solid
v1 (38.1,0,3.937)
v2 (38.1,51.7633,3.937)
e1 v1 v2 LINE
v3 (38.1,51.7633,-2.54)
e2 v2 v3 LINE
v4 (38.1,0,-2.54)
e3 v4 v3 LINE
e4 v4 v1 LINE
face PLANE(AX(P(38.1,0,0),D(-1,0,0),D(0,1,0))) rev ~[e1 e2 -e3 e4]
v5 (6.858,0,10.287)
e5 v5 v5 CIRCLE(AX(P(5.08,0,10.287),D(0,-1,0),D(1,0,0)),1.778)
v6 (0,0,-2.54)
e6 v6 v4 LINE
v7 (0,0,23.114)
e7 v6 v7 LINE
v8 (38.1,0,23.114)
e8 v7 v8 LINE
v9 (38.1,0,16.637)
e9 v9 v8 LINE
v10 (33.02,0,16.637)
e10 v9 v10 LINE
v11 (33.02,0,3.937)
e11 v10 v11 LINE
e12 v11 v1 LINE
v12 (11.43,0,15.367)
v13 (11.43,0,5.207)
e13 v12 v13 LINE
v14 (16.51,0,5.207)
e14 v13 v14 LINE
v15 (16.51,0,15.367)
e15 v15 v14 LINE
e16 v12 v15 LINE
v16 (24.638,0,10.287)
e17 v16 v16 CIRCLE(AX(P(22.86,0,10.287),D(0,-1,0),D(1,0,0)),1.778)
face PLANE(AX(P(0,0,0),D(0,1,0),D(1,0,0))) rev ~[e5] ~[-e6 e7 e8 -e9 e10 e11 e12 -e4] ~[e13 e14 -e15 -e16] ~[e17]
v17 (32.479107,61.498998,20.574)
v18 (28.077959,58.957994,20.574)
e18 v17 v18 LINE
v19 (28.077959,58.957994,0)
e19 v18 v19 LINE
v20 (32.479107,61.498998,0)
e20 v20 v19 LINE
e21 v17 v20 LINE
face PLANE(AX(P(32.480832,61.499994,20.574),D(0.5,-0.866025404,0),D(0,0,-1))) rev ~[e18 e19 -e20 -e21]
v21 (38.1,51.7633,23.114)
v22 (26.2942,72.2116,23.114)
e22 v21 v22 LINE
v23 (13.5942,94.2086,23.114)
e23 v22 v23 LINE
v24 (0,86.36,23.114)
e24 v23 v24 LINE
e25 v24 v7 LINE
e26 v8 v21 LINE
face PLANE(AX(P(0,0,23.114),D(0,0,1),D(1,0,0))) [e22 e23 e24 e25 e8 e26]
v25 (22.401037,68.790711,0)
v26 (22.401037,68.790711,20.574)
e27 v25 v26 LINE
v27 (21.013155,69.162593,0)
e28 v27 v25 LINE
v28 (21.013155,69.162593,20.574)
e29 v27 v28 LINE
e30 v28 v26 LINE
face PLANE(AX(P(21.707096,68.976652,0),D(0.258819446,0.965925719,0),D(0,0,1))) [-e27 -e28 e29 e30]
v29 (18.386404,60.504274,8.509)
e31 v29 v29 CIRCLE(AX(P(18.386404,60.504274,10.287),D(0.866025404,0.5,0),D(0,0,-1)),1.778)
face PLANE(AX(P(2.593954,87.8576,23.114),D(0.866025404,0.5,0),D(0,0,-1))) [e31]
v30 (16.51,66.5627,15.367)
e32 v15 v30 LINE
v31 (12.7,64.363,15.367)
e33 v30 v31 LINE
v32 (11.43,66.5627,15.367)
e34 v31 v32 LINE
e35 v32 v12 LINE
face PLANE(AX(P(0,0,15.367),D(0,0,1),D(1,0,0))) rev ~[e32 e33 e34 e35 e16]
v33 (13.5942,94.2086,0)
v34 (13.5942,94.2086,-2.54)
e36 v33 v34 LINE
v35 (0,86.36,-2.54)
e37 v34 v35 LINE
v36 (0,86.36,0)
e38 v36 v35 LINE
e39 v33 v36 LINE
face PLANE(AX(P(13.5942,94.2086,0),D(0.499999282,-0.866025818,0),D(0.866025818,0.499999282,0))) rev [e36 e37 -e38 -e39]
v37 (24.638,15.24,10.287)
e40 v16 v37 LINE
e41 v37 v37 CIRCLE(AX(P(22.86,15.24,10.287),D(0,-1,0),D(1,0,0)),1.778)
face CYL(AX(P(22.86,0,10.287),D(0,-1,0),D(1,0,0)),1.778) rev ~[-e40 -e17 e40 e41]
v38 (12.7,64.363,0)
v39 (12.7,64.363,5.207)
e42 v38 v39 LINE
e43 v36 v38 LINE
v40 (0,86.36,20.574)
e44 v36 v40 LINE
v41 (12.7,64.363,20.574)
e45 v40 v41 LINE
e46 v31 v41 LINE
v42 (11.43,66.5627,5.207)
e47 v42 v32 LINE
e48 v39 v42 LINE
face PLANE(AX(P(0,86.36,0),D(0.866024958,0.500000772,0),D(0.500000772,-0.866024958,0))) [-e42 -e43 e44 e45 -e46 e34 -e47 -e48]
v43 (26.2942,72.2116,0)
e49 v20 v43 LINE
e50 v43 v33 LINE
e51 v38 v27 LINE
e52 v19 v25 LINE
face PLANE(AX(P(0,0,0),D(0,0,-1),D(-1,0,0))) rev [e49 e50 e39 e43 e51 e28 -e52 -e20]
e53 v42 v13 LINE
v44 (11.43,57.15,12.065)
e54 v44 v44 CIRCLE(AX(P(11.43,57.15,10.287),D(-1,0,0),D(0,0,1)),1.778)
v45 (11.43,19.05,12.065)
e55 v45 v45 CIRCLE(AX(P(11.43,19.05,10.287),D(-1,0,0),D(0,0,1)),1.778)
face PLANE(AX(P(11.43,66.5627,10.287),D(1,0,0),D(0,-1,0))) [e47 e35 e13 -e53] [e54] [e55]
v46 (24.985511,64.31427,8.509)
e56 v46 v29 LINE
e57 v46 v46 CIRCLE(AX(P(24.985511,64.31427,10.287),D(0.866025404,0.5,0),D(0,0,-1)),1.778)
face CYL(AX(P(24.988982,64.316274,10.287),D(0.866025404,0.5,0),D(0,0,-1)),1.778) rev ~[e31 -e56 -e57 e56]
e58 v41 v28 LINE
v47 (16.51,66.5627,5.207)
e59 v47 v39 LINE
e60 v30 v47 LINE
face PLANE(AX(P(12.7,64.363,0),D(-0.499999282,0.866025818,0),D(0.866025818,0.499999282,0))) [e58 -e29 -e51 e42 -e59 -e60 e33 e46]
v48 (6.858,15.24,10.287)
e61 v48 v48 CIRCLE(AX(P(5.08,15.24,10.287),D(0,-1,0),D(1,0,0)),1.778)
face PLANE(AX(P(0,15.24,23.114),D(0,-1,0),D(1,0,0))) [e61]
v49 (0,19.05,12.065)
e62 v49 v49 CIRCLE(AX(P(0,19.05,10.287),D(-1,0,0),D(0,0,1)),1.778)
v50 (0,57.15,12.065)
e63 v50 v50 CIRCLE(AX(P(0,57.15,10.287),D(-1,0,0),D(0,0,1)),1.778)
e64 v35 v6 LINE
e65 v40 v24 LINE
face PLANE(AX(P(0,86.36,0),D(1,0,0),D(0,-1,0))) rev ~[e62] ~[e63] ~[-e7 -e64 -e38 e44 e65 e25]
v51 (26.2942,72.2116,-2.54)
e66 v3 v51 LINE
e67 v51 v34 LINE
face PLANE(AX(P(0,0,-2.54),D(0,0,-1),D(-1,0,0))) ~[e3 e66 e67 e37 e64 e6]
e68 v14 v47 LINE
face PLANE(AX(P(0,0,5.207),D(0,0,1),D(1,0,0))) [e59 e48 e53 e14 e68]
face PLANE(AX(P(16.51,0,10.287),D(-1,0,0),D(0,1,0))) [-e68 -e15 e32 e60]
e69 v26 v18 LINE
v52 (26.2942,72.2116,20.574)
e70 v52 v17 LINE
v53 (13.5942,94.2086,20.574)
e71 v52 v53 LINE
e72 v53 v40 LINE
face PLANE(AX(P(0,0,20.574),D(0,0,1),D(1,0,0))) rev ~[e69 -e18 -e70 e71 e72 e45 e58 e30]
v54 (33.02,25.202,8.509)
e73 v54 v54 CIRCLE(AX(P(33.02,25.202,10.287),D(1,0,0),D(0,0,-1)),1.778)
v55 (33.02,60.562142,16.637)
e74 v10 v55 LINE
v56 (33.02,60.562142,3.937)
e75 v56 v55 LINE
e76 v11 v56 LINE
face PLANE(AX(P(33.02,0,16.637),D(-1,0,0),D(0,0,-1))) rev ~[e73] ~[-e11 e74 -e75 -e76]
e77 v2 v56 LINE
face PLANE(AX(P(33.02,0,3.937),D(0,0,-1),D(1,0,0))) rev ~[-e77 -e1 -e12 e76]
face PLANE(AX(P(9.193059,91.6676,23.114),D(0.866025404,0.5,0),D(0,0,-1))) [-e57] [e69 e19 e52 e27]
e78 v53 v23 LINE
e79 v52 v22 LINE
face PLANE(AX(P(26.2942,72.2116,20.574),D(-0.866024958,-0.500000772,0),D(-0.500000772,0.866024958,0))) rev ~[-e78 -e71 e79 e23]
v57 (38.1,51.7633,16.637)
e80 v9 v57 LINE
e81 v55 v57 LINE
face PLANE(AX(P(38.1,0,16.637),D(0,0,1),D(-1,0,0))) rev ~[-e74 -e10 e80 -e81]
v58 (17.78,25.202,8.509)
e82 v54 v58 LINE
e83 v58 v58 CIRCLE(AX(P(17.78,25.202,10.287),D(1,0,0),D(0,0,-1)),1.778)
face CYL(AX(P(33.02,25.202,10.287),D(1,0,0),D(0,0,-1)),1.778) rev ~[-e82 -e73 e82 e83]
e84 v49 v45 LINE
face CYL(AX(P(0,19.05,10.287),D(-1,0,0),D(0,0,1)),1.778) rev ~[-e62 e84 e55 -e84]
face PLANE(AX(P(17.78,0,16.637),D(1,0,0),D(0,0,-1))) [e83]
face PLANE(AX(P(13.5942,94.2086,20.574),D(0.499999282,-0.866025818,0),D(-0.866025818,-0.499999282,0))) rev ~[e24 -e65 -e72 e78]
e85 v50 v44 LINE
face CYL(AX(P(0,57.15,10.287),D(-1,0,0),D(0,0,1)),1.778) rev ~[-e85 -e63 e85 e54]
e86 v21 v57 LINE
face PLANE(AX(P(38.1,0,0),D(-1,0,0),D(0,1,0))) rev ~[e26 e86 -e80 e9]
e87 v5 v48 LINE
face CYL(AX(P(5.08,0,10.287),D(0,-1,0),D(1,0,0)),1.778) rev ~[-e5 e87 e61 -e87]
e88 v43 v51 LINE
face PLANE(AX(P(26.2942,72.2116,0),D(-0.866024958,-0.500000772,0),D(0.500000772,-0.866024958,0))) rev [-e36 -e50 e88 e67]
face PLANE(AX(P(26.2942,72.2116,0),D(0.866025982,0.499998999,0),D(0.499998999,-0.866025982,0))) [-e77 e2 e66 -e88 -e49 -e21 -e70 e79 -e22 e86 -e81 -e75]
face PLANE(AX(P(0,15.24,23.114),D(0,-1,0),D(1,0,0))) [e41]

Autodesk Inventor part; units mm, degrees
ref_plane "YZ Plane" through (0, 0, 0) normal (1, 0, 0) x (0, 1, 0)
ref_plane "XZ Plane" through (0, 0, 0) normal (0, 1, 0) x (-1, 0, 0)
sketch "Sketch1" plane through (0, 0, 0) normal (0, 0, 1) x (1, 0, 0)
  line L0 (0, 0) -> (38.1, 0)
  line L1 (38.1, 0) -> (38.1, 51.7633)
  line L2 (0, 86.36) -> (0, 0)
  line L3 (0, 86.36) -> (13.5942, 94.2086)
  line L4 (0, 86.36) -> (12.7, 64.363)
  line L5 (12.7, 64.363) -> (26.2942, 72.2116)
  line L6 (26.2942, 72.2116) -> (13.5942, 94.2086)
  line L7 (26.2942, 72.2116) -> (38.1, 51.7633)
  dimension "d0" = 15.6972
  dimension "d1" = 25.4
  dimension "d2" = 38.1
  dimension "d3" = 86.36
  dimension "d4" = 120
extrude "Extrusion1" add sketch "Sketch1" along normal blind 20.574 contours L2 L4 L5 L7 L1 L0
sketch "Sketch2" plane through (0, 0, 20.574) normal (0, 0, 1) x (1, 0, 0)
  line L0 (0, 86.36) -> (0, 0) projected
  line L1 (0, 0) -> (38.1, 0) projected
  line L2 (38.1, 0) -> (38.1, 51.7633) projected
  line L3 (38.1, 51.7633) -> (26.2942, 72.2116) projected
  line L4 (26.2942, 72.2116) -> (12.7, 64.363) projected
  line L5 (12.7, 64.363) -> (0, 86.36) projected
  line L6 (26.2942, 72.2116) -> (13.5942, 94.2086)
  line L7 (13.5942, 94.2086) -> (0, 86.36)
  line L8 (38.1, 51.7633) -> (26.2942, 72.2116) projected
extrude "Extrusion2" add sketch "Sketch2" along normal blind 2.54
ref_plane "Work Plane1" through (0, 0, 10.287) normal (0, 0, -1) x (-1, 0, 0)
mirror "Mirror1" about plane through (0, 0, 10.287) normal (0, 0, -1) of "Extrusion2"
sketch "Sketch3" plane through (0, 0, 23.114) normal (0, -1, 0) x (1, 0, 0)
  line L0 (38.1, -25.654) -> (38.1, 0) projected
  line L1 (38.1, -6.477) -> (33.02, -6.477)
  line L2 (33.02, -6.477) -> (33.02, -19.177)
  line L3 (33.02, -19.177) -> (38.1, -19.177)
  line L4 (38.1, -19.177) -> (38.1, -6.477)
  point P0 (0, -23.114)
  point P1 (38.1, -12.827)
  dimension "d9" = 12.7
  dimension "d10" = 6.35
  dimension "d11" = 5.08
extrude "Extrusion3" cut sketch "Sketch3" against normal blind 76.2
sketch "Sketch4" plane through (33.02, 0, 16.637) normal (1, 0, 0) x (0, 0, -1)
  circle A0 centre (6.35, 25.202) radius 1.778 projected
  point P0 (16.637, 0)
extrude "Extrusion4" cut sketch "Sketch4" against normal blind 15.24
sketch "Sketch5" plane through (13.5942, 94.2086, 23.114) normal (0.8660254, 0.5, 0) x (0, 0, -1)
  line L0 (23.114, -25.4) -> (2.54, -25.4) projected
  line L1 (23.114, -25.4) -> (2.54, -25.4)
  line L2 (2.54, -25.4) -> (2.54, -37.7698)
  line L3 (2.54, -37.7698) -> (23.114, -37.7698)
  line L4 (23.114, -37.7698) -> (23.114, -25.4)
  point P0 (23.114, -74.79)
  dimension "d16" = 12.3698
extrude "Extrusion5" cut sketch "Sketch5" against normal blind 5.08
chamfer "Chamfer1" distance 1.016 angle 45 1 edges at (21.893, 69.6706, 10.287)
sketch "Sketch6" plane through (9.1948, 91.6686, 23.114) normal (0.8660254, 0.5, 0) x (0, 0, -1)
  line L0 (22.86, -25.4) -> (2.54, -25.4) projected
  line L1 (23.114, -37.7698) -> (2.54, -37.7698) projected
  circle A0 centre (12.827, -31.5849) radius 1.778
  line L2 (2.54, -37.7698) -> (2.54, 0) projected
  line L3 (2.54, -25.4) -> (2.54, -37.7698)
  point P0 (23.114, -74.79)
  point P1 (12.827, -37.7698)
  point P2 (2.54, -31.5849)
  dimension "d22" = 3.556
extrude "Extrusion6" cut sketch "Sketch6" against normal blind 7.62
ref_plane "Work Plane2" through (0, 0, 10.287) normal (0, 0, 1) x (1, 0, 0)
sketch "Sketch7" plane through (0, 0, 10.287) normal (0, 0, 1) x (1, 0, 0)
  line L0 (12.7, 64.363) -> (0, 86.36) projected
  line L1 (21.0149, 69.1636) -> (12.7, 64.363) projected
  line L2 (0, 0) -> (38.1, 0) projected
  line L3 (16.8574, 0) -> (11.3142, 0)
  line L4 (16.51, 66.5627) -> (11.43, 66.5627)
  line L5 (11.43, 66.5627) -> (11.43, 0)
  line L6 (11.43, 0) -> (16.51, 0)
  line L7 (16.51, 0) -> (16.51, 66.5627)
  dimension "d26" = 5.08
extrude "Extrusion7" cut sketch "Sketch7" along normal mid plane 10.16 contours L1 L7 L2 L5 L0
sketch "Sketch8" plane through (0, 0, 23.114) normal (-1, 0, 0) x (0, 0, 1)
  circle A0 centre (-12.827, 57.15) radius 1.778 projected
  circle A1 centre (-12.827, 19.05) radius 1.778 projected
  point P0 (-23.114, 0)
extrude "Extrusion8" cut sketch "Sketch8" against normal blind 15.24
sketch "Sketch9" plane through (0, 0, 23.114) normal (0, -1, 0) x (1, 0, 0)
  circle A0 centre (5.08, -12.827) radius 1.778 projected
  circle A1 centre (22.86, -12.827) radius 1.778 projected
  point P0 (0, -23.114)
extrude "Extrusion9" cut sketch "Sketch9" against normal blind 15.24
equation "\"d10\" = 0.5 * d9"
properties part number "PALM 3"
